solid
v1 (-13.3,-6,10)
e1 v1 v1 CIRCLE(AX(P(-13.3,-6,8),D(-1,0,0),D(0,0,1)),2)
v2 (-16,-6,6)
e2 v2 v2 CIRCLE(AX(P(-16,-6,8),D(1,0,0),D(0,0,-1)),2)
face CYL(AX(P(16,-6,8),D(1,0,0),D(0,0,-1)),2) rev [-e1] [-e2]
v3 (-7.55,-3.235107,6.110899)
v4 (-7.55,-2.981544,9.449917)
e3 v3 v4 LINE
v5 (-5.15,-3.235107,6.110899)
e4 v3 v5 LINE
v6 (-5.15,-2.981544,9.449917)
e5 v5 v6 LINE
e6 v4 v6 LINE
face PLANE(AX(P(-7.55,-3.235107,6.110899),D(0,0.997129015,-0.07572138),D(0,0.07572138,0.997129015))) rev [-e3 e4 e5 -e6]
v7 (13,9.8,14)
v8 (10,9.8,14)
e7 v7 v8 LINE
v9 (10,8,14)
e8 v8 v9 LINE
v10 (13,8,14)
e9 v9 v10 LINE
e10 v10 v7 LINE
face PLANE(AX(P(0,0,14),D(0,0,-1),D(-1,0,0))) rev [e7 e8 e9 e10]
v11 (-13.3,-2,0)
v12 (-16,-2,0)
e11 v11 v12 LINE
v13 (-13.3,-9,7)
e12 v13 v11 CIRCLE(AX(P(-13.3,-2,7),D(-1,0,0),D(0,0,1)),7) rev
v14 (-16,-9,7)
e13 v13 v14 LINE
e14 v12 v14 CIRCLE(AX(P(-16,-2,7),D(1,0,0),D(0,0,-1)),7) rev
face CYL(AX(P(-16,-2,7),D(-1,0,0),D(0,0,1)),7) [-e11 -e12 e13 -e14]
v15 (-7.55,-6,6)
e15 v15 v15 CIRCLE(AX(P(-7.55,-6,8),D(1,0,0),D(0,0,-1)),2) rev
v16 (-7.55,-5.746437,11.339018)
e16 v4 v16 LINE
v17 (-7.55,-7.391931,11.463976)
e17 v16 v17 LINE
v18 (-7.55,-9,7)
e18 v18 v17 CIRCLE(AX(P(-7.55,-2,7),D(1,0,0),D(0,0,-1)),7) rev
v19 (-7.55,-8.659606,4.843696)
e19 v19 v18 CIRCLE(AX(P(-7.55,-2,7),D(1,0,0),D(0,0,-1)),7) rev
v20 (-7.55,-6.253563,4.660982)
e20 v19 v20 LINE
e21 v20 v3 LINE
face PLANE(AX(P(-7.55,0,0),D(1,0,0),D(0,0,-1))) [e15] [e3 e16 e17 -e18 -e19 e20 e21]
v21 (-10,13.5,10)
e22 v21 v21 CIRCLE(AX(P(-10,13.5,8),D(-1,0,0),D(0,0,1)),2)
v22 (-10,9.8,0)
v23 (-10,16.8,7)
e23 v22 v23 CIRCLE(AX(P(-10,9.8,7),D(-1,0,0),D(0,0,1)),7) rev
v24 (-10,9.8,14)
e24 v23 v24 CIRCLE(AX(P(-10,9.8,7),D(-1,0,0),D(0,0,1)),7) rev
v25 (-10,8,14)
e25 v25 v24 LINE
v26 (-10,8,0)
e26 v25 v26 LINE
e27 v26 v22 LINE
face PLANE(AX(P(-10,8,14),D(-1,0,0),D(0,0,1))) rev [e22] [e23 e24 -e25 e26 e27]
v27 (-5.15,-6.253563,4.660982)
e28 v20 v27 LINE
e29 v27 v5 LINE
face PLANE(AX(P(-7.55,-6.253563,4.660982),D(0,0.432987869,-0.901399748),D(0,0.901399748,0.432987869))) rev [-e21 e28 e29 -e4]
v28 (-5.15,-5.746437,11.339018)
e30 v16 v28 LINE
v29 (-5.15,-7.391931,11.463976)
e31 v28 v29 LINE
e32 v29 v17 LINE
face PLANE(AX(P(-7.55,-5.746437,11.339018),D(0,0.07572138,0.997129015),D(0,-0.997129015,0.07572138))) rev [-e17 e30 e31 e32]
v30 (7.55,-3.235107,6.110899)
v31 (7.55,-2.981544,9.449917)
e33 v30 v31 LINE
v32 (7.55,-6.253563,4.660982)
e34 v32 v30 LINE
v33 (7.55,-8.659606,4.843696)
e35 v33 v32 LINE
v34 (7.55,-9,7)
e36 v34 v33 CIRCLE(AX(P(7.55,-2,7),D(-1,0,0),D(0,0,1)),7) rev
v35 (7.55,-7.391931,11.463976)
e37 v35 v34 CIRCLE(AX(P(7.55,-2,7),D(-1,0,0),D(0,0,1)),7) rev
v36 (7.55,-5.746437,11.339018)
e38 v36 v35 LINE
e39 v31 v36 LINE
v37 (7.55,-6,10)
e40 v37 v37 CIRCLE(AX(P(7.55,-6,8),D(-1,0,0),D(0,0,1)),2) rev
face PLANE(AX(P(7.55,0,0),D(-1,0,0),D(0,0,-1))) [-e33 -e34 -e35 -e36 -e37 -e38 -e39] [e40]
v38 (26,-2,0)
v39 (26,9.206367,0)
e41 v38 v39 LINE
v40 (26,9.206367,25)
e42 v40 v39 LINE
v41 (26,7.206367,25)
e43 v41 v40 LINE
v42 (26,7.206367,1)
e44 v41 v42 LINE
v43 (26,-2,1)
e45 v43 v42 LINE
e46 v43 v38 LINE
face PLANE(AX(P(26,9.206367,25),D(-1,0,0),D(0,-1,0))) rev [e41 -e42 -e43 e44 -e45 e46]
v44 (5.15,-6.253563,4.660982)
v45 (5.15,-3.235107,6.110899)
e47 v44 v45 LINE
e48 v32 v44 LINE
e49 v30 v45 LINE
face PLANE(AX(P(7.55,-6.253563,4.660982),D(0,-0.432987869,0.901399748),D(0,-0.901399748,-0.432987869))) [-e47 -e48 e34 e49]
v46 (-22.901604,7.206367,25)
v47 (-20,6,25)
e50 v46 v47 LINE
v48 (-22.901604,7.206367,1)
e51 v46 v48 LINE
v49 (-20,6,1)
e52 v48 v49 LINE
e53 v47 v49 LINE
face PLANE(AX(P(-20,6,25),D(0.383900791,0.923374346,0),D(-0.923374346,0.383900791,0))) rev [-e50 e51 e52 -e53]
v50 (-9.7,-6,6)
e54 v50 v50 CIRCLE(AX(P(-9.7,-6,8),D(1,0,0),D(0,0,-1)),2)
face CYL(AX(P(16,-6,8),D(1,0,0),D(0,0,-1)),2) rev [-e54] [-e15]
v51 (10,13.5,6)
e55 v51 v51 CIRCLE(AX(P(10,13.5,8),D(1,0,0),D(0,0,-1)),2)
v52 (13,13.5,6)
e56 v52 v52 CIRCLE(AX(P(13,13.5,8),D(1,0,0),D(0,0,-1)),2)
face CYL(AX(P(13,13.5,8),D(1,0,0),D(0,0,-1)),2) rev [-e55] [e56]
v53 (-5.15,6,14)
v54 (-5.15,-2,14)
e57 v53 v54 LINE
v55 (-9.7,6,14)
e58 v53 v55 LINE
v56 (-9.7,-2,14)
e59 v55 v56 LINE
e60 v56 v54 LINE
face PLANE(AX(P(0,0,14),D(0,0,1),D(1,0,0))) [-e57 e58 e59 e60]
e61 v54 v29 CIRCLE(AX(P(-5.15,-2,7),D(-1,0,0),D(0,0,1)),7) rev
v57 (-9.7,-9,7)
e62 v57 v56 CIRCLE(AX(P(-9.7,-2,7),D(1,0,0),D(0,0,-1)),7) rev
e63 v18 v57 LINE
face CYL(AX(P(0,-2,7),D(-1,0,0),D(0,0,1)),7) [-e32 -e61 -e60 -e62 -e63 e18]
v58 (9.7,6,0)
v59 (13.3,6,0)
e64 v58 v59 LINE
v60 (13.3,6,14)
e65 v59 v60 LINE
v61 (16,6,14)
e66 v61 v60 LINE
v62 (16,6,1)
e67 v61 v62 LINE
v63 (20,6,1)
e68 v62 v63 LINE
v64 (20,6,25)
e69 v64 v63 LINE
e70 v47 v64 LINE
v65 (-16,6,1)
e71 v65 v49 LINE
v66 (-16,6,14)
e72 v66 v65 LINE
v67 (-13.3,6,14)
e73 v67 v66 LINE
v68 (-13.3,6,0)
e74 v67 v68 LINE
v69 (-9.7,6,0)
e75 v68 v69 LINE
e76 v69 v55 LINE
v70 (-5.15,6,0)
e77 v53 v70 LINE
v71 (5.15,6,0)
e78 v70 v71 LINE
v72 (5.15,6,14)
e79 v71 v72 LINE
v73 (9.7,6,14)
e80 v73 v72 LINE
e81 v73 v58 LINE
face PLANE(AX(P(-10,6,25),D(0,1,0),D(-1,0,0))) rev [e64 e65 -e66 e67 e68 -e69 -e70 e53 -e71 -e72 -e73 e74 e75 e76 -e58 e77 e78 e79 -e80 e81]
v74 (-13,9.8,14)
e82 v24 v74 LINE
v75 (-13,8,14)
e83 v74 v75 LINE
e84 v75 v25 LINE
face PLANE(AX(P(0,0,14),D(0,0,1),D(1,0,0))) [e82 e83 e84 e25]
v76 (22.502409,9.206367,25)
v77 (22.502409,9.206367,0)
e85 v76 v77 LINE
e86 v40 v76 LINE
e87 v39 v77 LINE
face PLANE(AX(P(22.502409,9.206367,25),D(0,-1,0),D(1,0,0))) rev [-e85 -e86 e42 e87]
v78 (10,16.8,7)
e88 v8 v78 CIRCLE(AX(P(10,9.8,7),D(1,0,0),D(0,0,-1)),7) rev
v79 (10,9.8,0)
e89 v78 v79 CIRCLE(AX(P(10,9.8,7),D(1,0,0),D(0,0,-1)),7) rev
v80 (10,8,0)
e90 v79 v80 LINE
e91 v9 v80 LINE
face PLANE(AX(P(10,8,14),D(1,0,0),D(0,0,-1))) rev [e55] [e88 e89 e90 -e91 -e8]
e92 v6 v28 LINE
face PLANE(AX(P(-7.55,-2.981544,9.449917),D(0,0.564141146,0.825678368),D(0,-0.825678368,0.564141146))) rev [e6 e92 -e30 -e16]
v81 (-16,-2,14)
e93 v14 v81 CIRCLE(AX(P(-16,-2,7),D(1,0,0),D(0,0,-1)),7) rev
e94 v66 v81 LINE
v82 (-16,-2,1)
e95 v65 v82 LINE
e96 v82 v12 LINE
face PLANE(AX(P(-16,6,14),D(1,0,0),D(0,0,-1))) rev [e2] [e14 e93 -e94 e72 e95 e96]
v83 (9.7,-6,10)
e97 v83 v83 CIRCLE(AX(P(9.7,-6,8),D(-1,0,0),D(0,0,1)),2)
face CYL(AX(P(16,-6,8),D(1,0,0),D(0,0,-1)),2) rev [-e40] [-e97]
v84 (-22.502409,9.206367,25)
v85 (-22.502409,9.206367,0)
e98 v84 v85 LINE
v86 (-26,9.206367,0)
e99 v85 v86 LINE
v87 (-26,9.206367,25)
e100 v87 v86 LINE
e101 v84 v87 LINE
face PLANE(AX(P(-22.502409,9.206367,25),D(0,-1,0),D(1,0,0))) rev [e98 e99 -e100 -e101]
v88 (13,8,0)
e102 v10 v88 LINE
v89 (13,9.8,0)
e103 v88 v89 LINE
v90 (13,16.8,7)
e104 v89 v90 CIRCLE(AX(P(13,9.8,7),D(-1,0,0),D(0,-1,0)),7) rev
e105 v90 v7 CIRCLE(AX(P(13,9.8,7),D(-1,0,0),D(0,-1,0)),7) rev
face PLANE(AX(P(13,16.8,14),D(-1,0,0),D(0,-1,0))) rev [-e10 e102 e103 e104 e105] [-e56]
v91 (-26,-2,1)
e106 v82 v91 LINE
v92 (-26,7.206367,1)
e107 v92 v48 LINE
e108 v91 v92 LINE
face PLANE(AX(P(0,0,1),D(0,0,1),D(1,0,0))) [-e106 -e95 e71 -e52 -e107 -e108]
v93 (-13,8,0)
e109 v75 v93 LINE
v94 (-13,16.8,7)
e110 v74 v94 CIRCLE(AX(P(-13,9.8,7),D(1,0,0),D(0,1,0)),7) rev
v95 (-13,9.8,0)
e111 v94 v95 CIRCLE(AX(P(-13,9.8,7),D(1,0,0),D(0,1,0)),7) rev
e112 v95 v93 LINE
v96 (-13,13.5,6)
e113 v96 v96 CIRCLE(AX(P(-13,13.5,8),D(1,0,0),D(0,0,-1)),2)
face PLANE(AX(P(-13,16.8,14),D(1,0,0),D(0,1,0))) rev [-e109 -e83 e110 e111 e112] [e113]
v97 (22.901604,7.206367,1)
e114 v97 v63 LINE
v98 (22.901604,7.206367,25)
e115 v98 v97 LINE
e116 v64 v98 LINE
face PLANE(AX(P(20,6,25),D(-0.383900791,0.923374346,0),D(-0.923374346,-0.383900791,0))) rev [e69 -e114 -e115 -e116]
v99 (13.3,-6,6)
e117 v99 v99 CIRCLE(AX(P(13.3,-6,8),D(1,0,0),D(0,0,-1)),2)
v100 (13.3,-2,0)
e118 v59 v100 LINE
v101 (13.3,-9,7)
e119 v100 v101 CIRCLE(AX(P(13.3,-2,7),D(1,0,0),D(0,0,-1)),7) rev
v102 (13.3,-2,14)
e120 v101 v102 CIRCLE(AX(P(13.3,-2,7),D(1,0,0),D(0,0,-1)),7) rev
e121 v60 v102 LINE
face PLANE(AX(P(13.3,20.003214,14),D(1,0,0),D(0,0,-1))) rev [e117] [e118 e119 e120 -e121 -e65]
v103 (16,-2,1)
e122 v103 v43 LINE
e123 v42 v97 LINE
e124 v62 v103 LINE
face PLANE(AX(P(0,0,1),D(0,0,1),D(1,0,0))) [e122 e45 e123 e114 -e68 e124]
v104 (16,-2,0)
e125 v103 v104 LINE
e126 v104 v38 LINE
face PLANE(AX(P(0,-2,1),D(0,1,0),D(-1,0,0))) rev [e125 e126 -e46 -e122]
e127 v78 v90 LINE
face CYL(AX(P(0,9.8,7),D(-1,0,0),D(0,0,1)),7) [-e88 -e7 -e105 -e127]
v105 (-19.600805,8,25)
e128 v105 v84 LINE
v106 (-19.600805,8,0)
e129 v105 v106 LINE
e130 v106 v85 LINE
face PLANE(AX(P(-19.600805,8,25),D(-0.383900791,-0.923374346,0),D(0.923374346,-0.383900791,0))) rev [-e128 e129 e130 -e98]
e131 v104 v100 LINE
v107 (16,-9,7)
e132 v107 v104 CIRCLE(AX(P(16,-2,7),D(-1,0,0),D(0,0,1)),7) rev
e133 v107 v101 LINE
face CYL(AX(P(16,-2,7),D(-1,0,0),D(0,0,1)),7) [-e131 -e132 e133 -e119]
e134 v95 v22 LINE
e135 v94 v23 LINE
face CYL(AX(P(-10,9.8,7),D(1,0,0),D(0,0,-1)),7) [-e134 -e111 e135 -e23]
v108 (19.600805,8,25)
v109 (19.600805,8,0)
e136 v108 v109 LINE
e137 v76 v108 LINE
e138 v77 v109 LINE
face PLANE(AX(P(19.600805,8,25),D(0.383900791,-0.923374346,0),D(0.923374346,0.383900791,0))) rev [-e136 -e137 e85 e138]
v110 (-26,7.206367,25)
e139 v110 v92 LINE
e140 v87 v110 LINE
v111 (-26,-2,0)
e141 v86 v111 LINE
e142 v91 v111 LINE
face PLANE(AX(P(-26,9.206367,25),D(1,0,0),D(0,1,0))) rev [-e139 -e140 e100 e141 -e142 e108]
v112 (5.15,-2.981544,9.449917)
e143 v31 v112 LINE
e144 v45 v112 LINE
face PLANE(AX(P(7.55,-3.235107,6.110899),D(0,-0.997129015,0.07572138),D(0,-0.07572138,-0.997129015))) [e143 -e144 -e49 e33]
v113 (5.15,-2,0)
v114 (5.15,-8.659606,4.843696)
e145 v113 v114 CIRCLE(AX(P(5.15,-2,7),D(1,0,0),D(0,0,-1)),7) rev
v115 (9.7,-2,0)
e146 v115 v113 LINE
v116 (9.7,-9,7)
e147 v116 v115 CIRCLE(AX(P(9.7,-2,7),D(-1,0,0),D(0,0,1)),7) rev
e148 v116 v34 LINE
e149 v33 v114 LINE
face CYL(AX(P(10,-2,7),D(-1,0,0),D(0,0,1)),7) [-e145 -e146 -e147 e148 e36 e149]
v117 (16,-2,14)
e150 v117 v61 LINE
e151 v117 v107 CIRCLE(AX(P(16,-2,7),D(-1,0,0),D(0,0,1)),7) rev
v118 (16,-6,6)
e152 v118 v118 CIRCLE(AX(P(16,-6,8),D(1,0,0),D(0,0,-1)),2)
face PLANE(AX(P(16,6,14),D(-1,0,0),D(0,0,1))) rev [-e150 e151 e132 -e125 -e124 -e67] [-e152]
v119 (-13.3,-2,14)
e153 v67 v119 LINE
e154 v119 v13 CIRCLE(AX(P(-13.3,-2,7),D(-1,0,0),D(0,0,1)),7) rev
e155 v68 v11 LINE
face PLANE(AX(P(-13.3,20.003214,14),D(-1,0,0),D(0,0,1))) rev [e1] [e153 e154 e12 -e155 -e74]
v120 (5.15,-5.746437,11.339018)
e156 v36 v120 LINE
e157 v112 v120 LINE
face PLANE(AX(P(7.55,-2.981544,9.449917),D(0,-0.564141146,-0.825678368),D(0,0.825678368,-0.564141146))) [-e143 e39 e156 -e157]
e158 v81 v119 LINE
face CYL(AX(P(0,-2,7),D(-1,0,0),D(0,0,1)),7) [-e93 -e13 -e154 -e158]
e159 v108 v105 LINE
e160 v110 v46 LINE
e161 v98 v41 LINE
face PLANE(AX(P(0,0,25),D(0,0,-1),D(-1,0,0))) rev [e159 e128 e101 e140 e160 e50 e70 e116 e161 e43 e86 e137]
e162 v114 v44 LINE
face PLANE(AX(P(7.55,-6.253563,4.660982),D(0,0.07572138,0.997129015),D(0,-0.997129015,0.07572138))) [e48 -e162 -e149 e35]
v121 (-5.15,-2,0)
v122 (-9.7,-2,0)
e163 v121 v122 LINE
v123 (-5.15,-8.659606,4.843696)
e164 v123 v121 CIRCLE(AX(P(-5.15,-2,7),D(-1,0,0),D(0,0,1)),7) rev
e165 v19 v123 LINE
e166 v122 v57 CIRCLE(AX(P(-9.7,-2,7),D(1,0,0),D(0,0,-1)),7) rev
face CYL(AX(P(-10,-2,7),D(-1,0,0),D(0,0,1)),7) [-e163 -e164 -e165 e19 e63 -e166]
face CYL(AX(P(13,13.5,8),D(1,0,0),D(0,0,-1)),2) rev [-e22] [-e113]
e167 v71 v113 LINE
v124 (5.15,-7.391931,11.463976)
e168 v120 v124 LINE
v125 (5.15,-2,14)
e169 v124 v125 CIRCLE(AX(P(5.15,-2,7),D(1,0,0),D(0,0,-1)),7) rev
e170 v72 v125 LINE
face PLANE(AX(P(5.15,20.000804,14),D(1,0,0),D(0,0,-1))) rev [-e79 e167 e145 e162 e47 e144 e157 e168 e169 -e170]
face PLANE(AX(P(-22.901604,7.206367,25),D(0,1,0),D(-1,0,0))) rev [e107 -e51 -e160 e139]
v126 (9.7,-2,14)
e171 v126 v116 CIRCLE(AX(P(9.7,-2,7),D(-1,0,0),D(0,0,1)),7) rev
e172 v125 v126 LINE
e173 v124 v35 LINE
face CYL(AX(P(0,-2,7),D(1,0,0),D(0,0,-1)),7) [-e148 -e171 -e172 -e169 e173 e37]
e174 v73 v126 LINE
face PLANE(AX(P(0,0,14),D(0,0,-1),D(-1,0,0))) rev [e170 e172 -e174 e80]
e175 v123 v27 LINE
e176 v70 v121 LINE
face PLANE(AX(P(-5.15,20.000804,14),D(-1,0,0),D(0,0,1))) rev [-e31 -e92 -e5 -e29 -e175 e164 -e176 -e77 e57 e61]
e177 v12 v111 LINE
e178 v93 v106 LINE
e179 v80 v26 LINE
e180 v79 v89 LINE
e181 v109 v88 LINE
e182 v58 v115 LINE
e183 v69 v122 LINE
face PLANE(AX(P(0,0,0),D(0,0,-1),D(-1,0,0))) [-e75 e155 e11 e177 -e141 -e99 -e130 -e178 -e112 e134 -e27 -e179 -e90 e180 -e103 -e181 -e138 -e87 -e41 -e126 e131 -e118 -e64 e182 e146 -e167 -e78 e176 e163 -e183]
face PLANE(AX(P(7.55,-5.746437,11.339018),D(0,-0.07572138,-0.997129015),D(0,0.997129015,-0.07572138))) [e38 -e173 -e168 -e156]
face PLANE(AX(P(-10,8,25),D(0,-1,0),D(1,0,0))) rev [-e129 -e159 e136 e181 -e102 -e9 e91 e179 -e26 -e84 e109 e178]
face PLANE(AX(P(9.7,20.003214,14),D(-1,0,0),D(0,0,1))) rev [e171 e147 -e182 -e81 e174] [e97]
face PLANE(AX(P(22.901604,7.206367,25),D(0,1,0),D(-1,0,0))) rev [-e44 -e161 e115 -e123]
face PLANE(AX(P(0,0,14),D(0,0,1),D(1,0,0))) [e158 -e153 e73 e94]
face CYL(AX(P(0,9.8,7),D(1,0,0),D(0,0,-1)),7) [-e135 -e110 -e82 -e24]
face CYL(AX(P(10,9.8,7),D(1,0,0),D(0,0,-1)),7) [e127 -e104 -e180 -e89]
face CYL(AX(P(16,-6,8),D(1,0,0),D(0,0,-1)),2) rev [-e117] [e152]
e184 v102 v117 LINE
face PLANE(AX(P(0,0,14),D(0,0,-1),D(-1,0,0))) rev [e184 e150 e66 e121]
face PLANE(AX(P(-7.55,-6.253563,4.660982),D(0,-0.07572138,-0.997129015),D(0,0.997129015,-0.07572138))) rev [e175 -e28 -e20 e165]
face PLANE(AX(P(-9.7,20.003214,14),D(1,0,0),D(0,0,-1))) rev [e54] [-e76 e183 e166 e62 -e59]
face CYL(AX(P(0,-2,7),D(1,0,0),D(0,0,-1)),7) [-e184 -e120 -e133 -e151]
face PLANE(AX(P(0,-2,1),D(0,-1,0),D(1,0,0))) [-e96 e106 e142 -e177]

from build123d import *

# Parameters (mm, degrees)
SKETCH2_W                 = 5
SKETCH2_H                 = 15
BOSS_EXTRUDE1_DEPTH       = 14
BOSS_EXTRUDE1_2_DEPTH     = 14
BOSS_EXTRUDE3_DEPTH       = 25
SKETCH5_W                 = 3
SKETCH5_H                 = 8.8
BOSS_EXTRUDE4_DEPTH       = 14
SKETCH7_W                 = 3
SKETCH7_H                 = 15
BOSS_EXTRUDE5_DEPTH       = 14
SKETCH15_W                = 0.3
SKETCH15_H                = 14
CUT_EXTRUDE2_DEPTH        = 15
SKETCH16_W                = 0.15
SKETCH16_H                = 14
CUT_EXTRUDE3_DEPTH        = 15
FILLET1_R                 = 7
F_4_0MM_DOWEL_HOLE2_D     = 4
FILLET2_R                 = 7
F_4_0MM_DOWEL_HOLE1_D     = 4
F_4_0MM_DOWEL_HOLE1_DEPTH = 26
F_4_0MM_DOWEL_HOLE1_TIP   = 1.201721238
BOSS_EXTRUDE6_DEPTH       = 1
CUT_EXTRUDE4_DEPTH        = 2.4


with BuildPart() as part:
    # Sketch2 → Boss-Extrude1 (new body)
    with BuildSketch(Plane.XY):
        with Locations((-7.5, -1.5)):
            Rectangle(SKETCH2_W, SKETCH2_H)
    extrude(amount=BOSS_EXTRUDE1_DEPTH)



with BuildPart() as body_2:
    # Sketch2 → Boss-Extrude1 2 (new body)
    with BuildSketch(Plane.XY):
        with Locations((7.5, -1.5)):
            Rectangle(SKETCH2_W, SKETCH2_H)
    extrude(amount=BOSS_EXTRUDE1_2_DEPTH)


with BuildPart() as part_1:
    add(part.part)

    add(body_2.part)  # Boss-Extrude3 merges body 2
    # Sketch4 → Boss-Extrude3 (add)
    with BuildSketch(Plane.XY):
        Polygon((-10, 6), (-20, 6), (-22.901603942, 7.206366686), (-26, 7.206366686), (-26, 9.206366686), (-22.502408858, 9.206366686), (-19.600804916, 8), (-10, 8), (10, 8), (19.600804916, 8), (22.502408858, 9.206366686), (26, 9.206366686), (26, 7.206366686), (22.901603942, 7.206366686), (20, 6), (10, 6), align=None)
    extrude(amount=BOSS_EXTRUDE3_DEPTH)

    # Sketch5 → Boss-Extrude4 (add)
    with BuildSketch(Plane.XY):
        with Locations((-11.5, 12.4)):
            Rectangle(SKETCH5_W, SKETCH5_H)
        with Locations((11.5, 12.4)):
            Rectangle(SKETCH5_W, SKETCH5_H)
    extrude(amount=BOSS_EXTRUDE4_DEPTH)

    # Sketch7 → Boss-Extrude5 (add)
    with BuildSketch(Plane.XY):
        with Locations((-14.5, -1.5)):
            Rectangle(SKETCH7_W, SKETCH7_H)
        with Locations((14.5, -1.5)):
            Rectangle(SKETCH7_W, SKETCH7_H)
    extrude(amount=BOSS_EXTRUDE5_DEPTH)

    # Sketch15 → Cut-Extrude2 (cut)
    with BuildSketch(Plane.XZ.offset(9)):
        with Locations((-9.85, 7)):
            Rectangle(SKETCH15_W, SKETCH15_H)
        with Locations((9.85, 7)):
            Rectangle(SKETCH15_W, SKETCH15_H)
        with Locations((-13.15, 7)):
            Rectangle(SKETCH15_W, SKETCH15_H)
        with Locations((13.15, 7)):
            Rectangle(SKETCH15_W, SKETCH15_H)
    extrude(amount=-CUT_EXTRUDE2_DEPTH, mode=Mode.SUBTRACT)

    # Sketch16 → Cut-Extrude3 (cut)
    with BuildSketch(Plane.XZ.offset(9)):
        with Locations((-5.075, 7)):
            Rectangle(SKETCH16_W, SKETCH16_H)
        with Locations((5.075, 7)):
            Rectangle(SKETCH16_W, SKETCH16_H)
    extrude(amount=-CUT_EXTRUDE3_DEPTH, mode=Mode.SUBTRACT)

    # Fillet1
    fillet1_edges = [part_1.edges().sort_by_distance(p)[0] for p in [
        (7.425, -9, 0),
        (7.425, -9, 14),
        (-7.425, -9, 0),
        (-7.425, -9, 14),
        (-14.65, -9, 0),
        (-14.65, -9, 14),
        (14.65, -9, 14),
        (14.65, -9, 0),
    ]]
    fillet(fillet1_edges, radius=FILLET1_R - 0.0001)  # a hair under: the kernel refuses the full size

    # Ø4.0mm Dowel Hole2 (through all)
    with Locations(Plane(origin=(16, 0, 0), x_dir=(0, 0, -1), z_dir=(1, 0, 0))):
        with Locations((-8, -6)):
            Hole(F_4_0MM_DOWEL_HOLE2_D / 2)

    # Fillet2
    fillet2_edges = [part_1.edges().sort_by_distance(p)[0] for p in [
        (-11.5, 16.8, 0),
        (-11.5, 16.8, 14),
        (11.5, 16.8, 0),
        (11.5, 16.8, 14),
    ]]
    fillet(fillet2_edges, radius=FILLET2_R - 0.0001)  # a hair under: the kernel refuses the full size

    # Ø4.0mm Dowel Hole1
    with Locations(Plane(origin=(13, 0, 0), x_dir=(0, 0, -1), z_dir=(1, 0, 0))):
        with Locations((-8, 13.5)):
            Hole(F_4_0MM_DOWEL_HOLE1_D / 2, depth=F_4_0MM_DOWEL_HOLE1_DEPTH)
            with Locations((0, 0, -(F_4_0MM_DOWEL_HOLE1_DEPTH + F_4_0MM_DOWEL_HOLE1_TIP / 2))):  # 118° drill point
                Cone(0, F_4_0MM_DOWEL_HOLE1_D / 2, F_4_0MM_DOWEL_HOLE1_TIP, mode=Mode.SUBTRACT)

    # Sketch14 → Boss-Extrude6 (add)
    with BuildSketch(Plane.XY):
        Polygon((-22.901603942, 7.206366686), (-26, 7.206366686), (-26, -2), (-16, -2), (-16, 6), (-20, 6), align=None)
        Polygon((20, 6), (16, 6), (16, -2), (26, -2), (26, 7.206366686), (22.901603942, 7.206366686), align=None)
    extrude(amount=BOSS_EXTRUDE6_DEPTH)

    # Sketch18 → Cut-Extrude4 (cut)
    with BuildSketch(Plane(origin=(-5.15, 0, 0), x_dir=(0, 0, -1), z_dir=(1, 0, 0))):
        Polygon((-6.110899152, -3.235107358), (-9.449916842, -2.981544355), (-11.33901769, -5.746436996), (-12.466071308, -20.587923763), (-5.788035927, -21.095049771), (-4.66098231, -6.253563004), align=None)
    cut_extrude4 = extrude(amount=-CUT_EXTRUDE4_DEPTH, mode=Mode.SUBTRACT)

    # Mirror1: Cut-Extrude4 across plane
    add(cut_extrude4.mirror(Plane(origin=(0, 0, 0), x_dir=(0, 0, 1), z_dir=(1, 0, 0))), mode=Mode.SUBTRACT)


solid = part_1.part
